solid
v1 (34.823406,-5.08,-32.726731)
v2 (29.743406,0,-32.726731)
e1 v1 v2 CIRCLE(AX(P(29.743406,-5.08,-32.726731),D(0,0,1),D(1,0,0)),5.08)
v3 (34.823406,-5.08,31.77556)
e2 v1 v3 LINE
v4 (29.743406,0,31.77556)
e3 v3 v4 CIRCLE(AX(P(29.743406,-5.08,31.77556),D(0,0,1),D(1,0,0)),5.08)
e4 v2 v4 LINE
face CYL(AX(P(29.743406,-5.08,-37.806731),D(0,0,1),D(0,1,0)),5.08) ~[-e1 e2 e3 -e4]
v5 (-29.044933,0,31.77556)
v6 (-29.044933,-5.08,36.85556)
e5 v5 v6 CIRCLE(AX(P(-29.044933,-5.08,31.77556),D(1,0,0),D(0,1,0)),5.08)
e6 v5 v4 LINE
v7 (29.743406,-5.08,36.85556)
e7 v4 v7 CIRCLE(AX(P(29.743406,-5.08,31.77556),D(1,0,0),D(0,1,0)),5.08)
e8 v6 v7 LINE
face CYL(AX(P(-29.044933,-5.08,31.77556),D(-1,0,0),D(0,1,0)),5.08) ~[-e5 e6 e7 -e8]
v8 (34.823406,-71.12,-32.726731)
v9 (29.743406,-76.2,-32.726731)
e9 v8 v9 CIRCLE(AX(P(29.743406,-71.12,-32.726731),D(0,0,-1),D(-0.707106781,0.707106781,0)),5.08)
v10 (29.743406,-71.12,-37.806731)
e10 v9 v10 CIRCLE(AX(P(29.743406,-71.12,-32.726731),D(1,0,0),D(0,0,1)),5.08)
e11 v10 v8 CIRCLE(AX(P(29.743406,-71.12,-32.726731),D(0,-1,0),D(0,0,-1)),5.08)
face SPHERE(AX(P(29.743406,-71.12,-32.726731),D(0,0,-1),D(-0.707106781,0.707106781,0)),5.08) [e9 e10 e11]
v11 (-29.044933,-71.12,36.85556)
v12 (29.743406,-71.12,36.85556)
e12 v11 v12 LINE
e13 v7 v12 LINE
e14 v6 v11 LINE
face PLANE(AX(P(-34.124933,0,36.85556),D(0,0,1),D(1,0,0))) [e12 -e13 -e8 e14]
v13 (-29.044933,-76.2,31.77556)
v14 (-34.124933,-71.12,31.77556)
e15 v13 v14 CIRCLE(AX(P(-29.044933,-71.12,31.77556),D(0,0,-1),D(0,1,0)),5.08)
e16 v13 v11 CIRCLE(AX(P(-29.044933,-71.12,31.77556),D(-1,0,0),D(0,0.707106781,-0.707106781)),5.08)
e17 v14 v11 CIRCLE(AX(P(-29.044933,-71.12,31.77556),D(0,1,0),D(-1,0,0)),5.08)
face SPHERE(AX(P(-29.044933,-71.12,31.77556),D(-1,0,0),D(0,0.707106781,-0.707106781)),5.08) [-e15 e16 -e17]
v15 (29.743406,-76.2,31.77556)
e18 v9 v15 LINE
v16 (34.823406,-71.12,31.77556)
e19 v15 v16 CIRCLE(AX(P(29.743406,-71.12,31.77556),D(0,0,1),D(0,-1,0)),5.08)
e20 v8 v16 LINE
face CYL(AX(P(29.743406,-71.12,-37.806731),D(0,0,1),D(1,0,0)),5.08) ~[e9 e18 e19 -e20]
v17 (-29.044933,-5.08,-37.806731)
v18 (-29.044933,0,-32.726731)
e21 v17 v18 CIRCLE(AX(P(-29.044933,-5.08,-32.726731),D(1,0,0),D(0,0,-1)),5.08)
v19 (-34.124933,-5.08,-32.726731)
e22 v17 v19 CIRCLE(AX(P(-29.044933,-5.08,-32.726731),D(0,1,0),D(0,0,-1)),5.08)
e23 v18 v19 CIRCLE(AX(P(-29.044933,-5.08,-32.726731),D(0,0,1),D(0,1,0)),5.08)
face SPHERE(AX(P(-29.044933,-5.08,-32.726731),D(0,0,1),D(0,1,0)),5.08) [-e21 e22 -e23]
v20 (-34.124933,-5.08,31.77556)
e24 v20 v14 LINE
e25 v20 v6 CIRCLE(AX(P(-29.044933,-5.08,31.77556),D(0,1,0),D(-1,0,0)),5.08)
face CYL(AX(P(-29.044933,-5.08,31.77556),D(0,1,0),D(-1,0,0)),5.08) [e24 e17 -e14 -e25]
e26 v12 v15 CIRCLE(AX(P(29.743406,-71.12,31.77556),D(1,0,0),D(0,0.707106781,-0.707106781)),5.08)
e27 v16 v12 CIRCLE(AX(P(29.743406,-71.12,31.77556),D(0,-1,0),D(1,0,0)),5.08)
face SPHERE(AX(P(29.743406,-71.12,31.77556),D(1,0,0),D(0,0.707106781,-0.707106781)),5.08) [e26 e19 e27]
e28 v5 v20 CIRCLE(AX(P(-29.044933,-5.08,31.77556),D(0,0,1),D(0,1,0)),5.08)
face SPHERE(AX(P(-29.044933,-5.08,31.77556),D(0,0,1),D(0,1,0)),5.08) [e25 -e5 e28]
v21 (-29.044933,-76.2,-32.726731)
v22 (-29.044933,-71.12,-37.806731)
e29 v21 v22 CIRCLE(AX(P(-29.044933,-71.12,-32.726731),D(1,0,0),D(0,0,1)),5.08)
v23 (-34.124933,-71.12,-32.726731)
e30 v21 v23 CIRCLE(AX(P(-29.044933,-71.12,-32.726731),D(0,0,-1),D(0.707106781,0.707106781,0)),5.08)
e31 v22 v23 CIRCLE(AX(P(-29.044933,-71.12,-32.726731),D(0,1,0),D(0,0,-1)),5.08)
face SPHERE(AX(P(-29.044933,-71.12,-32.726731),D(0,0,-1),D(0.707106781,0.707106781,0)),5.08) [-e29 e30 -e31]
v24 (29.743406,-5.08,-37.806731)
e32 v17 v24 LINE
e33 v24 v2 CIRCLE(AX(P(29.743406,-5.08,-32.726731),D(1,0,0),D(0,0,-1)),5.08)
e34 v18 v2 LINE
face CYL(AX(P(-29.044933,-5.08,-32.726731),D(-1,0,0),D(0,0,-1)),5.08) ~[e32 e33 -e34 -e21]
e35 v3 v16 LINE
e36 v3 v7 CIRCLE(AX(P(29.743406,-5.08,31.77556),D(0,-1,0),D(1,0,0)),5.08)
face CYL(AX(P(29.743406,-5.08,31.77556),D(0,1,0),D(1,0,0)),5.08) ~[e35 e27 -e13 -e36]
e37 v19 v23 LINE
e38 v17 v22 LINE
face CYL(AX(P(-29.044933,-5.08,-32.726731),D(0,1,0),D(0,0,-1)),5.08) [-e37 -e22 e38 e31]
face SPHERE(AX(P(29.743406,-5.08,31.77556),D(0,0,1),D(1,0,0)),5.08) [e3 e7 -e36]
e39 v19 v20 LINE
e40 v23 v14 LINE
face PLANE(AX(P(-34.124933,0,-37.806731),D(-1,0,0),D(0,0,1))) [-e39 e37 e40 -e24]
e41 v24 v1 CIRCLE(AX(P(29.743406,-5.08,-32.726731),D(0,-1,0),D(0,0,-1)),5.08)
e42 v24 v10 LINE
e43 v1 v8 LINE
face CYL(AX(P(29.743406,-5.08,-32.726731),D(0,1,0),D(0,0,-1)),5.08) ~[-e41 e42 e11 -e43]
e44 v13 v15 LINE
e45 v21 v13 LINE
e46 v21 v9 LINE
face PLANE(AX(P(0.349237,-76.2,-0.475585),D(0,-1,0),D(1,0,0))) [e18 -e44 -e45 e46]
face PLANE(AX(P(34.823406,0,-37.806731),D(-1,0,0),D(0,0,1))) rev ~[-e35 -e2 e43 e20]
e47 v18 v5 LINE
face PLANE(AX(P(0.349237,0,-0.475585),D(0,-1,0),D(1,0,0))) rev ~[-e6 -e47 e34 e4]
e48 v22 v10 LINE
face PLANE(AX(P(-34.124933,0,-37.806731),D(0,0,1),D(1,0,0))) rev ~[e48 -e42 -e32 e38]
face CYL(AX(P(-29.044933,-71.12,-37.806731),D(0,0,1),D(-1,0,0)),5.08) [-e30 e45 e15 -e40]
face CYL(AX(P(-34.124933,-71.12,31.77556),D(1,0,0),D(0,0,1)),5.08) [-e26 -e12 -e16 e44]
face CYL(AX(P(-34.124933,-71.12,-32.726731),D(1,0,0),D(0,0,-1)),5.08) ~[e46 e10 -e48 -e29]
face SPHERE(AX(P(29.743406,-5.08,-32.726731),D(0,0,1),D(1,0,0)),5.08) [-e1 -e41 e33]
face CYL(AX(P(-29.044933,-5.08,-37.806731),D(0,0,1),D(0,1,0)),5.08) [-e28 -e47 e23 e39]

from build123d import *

# Parameters (mm, degrees)
F0_W         = 68.9483396709
F0_H         = 74.6622905135
F1_DEPTH     = 76.2
F2_R         = 5.08
F3_R         = 5.08
F4_R         = 5.08
F5_T1_DEPTH  = 66.04
F5_T3_DEPTH  = 58.7883396709
F5_S7_W      = 5.08
F5_S7_H      = 5.08
F5_T8_DEPTH  = 5.08
F5_S13_W     = 5.08
F5_S13_H     = 5.08
F5_T14_DEPTH = 5.08
F5_T18_ANGLE = 90
F5_T20_ANGLE = 90
F6_T1_DEPTH  = 58.7883396709
F6_T3_DEPTH  = 66.04
F6_S7_W      = 5.08
F6_S7_H      = 5.08
F6_T8_DEPTH  = 5.08
F6_S13_W     = 5.08
F6_S13_H     = 5.08
F6_T14_DEPTH = 5.08
F6_T18_ANGLE = 90
F6_T20_ANGLE = 90


# Not quite as in the source:
# - a fillet or chamfer that OpenCascade refuses, or shapes differently, is made with other operations: its cross-section is extruded or revolved along the edge and cut away or added


with BuildPart() as f1:
    # F0 (on Front) → F1 (new body)
    with BuildSketch(Plane.XZ):
        with Locations((0.3492366523, -0.4755854607)):
            Rectangle(F0_W, F0_H)
    extrude(amount=F1_DEPTH)

    # F2
    f2_edges = [f1.edges().sort_by_distance(p)[0] for p in [
        (34.823406, -76.2, -0.475585),
        (0.349237, -76.2, 36.85556),
        (-34.124933, -76.2, -0.475585),
        (0.349237, -76.2, -37.806731),
    ]]
    fillet(f2_edges, radius=F2_R)

    # F3
    f3_edges = [f1.edges().sort_by_distance(p)[0] for p in [
        (34.823406, 0, -0.475585),
    ]]
    fillet(f3_edges, radius=F3_R)

    # F4
    f4_edges = [f1.edges().sort_by_distance(p)[0] for p in [
        (-34.124933, 0, -0.475585),
    ]]
    fillet(f4_edges, radius=F4_R)

    # F5: fillet of radius 5.08 on 1 edges, made by hand

    # F5_s2 → F5_t1 (cut)
    with BuildSketch(Plane.XZ.offset(5.08)):
        with BuildLine():
            ThreePointArc((34.8234064877, 31.7755597961), (33.3355089361, 35.3676622445), (29.7434064877, 36.8555597961))
            Line((29.7434064877, 36.8555597961), (34.8234064877, 36.8555597961))
            Line((34.8234064877, 36.8555597961), (34.8234064877, 31.7755597961))
        make_face()
        with BuildLine():
            ThreePointArc((-34.1249331832, 31.7755597961), (-32.6370356316, 35.3676622445), (-29.0449331832, 36.8555597961))
            Line((-29.0449331832, 36.8555597961), (-34.1249331832, 36.8555597961))
            Line((-34.1249331832, 36.8555597961), (-34.1249331832, 31.7755597961))
        make_face()
    extrude(amount=F5_T1_DEPTH, mode=Mode.SUBTRACT)

    # F5_s4 → F5_t3 (cut)
    with BuildSketch(Plane.YZ.offset(-29.0449331832)):
        with BuildLine():
            ThreePointArc((0, 31.7755597961), (-1.4878975516, 35.3676622445), (-5.08, 36.8555597961))
            Line((-5.08, 36.8555597961), (0, 36.8555597961))
            Line((0, 36.8555597961), (0, 31.7755597961))
        make_face()
    extrude(amount=F5_T3_DEPTH, mode=Mode.SUBTRACT)


with BuildPart() as f5_tool6:
    # F5_s7 → F5_t8 (new body)
    with BuildSketch(Plane.YZ.offset(29.7434064877)):
        with Locations((-73.66, 34.3155597961)):
            Rectangle(F5_S7_W, F5_S7_H)
    extrude(amount=F5_T8_DEPTH)

    # F5_s9 → F5_t10 (revolve, cut)
    with BuildSketch(Plane(origin=(29.7434064877, -71.12, 31.7755597961), x_dir=(0, 0.7071067812, -0.7071067812), z_dir=(0, -0.7071067812, -0.7071067812))):
        with BuildLine():
            ThreePointArc((0, -5.08), (5.08, 0), (0, 5.08))
            Line((0, 5.08), (0, -5.08))
        make_face()
    revolve(axis=Axis((29.7434064877, -71.12, 31.7755597961), (1, 0, 0)), mode=Mode.SUBTRACT)


with BuildPart() as f1_1:
    add(f1.part)

    # F5_t5: cut F5_tool6
    add(f5_tool6.part, mode=Mode.SUBTRACT)


with BuildPart() as f5_tool12:
    # F5_s13 → F5_t14 (new body)
    with BuildSketch(Plane.YZ.offset(-29.0449331832)):
        with Locations((-73.66, 34.3155597961)):
            Rectangle(F5_S13_W, F5_S13_H)
    extrude(amount=-F5_T14_DEPTH)

    # F5_s15 → F5_t16 (revolve, cut)
    with BuildSketch(Plane(origin=(-29.0449331832, -71.12, 31.7755597961), x_dir=(0, 0.7071067812, -0.7071067812), z_dir=(0, 0.7071067812, 0.7071067812))):
        with BuildLine():
            ThreePointArc((0, -5.08), (5.08, 0), (0, 5.08))
            Line((0, 5.08), (0, -5.08))
        make_face()
    revolve(axis=Axis((-29.0449331832, -71.12, 31.7755597961), (-1, 0, 0)), mode=Mode.SUBTRACT)


with BuildPart() as f1_2:
    add(f1_1.part)

    # F5_t11: cut F5_tool12
    add(f5_tool12.part, mode=Mode.SUBTRACT)

    # F5_s17 → F5_t18 (revolve, cut)
    with BuildSketch(Plane.XZ.offset(5.08)):
        with BuildLine():
            ThreePointArc((34.8234064877, 31.7755597961), (33.3355089361, 35.3676622445), (29.7434064877, 36.8555597961))
            Line((29.7434064877, 36.8555597961), (34.8234064877, 36.8555597961))
            Line((34.8234064877, 36.8555597961), (34.8234064877, 31.7755597961))
        make_face()
    revolve(axis=Axis((29.7434064877, -5.08, 36.8555597961), (0, 0, 1)), revolution_arc=F5_T18_ANGLE, mode=Mode.SUBTRACT)

    # F5_s19 → F5_t20 (revolve, cut)
    with BuildSketch(Plane.YZ.offset(-29.0449331832)):
        with BuildLine():
            ThreePointArc((0, 31.7755597961), (-1.4878975516, 35.3676622445), (-5.08, 36.8555597961))
            Line((-5.08, 36.8555597961), (0, 36.8555597961))
            Line((0, 36.8555597961), (0, 31.7755597961))
        make_face()
    revolve(axis=Axis((-29.0449331832, -5.08, 36.8555597961), (0, 0, 1)), revolution_arc=F5_T20_ANGLE, mode=Mode.SUBTRACT)

    # F6: fillet of radius 5.08 on 1 edges, made by hand

    # F6_s2 → F6_t1 (cut)
    with BuildSketch(Plane.YZ.offset(-29.0449331832)):
        with BuildLine():
            ThreePointArc((-5.08, -37.8067307174), (-1.4878975516, -36.3188331658), (0, -32.7267307174))
            Line((0, -32.7267307174), (0, -37.8067307174))
            Line((0, -37.8067307174), (-5.08, -37.8067307174))
        make_face()
    extrude(amount=F6_T1_DEPTH, mode=Mode.SUBTRACT)

    # F6_s4 → F6_t3 (cut)
    with BuildSketch(Plane.XZ.offset(5.08)):
        with BuildLine():
            ThreePointArc((29.7434064877, -37.8067307174), (33.3355089361, -36.3188331658), (34.8234064877, -32.7267307174))
            Line((34.8234064877, -32.7267307174), (34.8234064877, -37.8067307174))
            Line((34.8234064877, -37.8067307174), (29.7434064877, -37.8067307174))
        make_face()
        with BuildLine():
            ThreePointArc((-29.0449331832, -37.8067307174), (-32.6370356316, -36.3188331658), (-34.1249331832, -32.7267307174))
            Line((-34.1249331832, -32.7267307174), (-34.1249331832, -37.8067307174))
            Line((-34.1249331832, -37.8067307174), (-29.0449331832, -37.8067307174))
        make_face()
    extrude(amount=F6_T3_DEPTH, mode=Mode.SUBTRACT)


with BuildPart() as f6_tool6:
    # F6_s7 → F6_t8 (new body)
    with BuildSketch(Plane.XY.offset(-32.7267307174)):
        with Locations((32.2834064877, -73.66)):
            Rectangle(F6_S7_W, F6_S7_H)
    extrude(amount=-F6_T8_DEPTH)

    # F6_s9 → F6_t10 (revolve, cut)
    with BuildSketch(Plane(origin=(29.7434064877, -71.12, -32.7267307174), x_dir=(-0.7071067812, 0.7071067812, 0), z_dir=(-0.7071067812, -0.7071067812, 0))):
        with BuildLine():
            ThreePointArc((0, -5.08), (5.08, 0), (0, 5.08))
            Line((0, 5.08), (0, -5.08))
        make_face()
    revolve(axis=Axis((29.7434064877, -71.12, -32.7267307174), (0, 0, -1)), mode=Mode.SUBTRACT)


with BuildPart() as f1_3:
    add(f1_2.part)

    # F6_t5: cut F6_tool6
    add(f6_tool6.part, mode=Mode.SUBTRACT)


with BuildPart() as f6_tool12:
    # F6_s13 → F6_t14 (new body)
    with BuildSketch(Plane.XY.offset(-32.7267307174)):
        with Locations((-31.5849331832, -73.66)):
            Rectangle(F6_S13_W, F6_S13_H)
    extrude(amount=-F6_T14_DEPTH)

    # F6_s15 → F6_t16 (revolve, cut)
    with BuildSketch(Plane(origin=(-29.0449331832, -71.12, -32.7267307174), x_dir=(0.7071067812, 0.7071067812, 0), z_dir=(-0.7071067812, 0.7071067812, 0))):
        with BuildLine():
            ThreePointArc((0, -5.08), (5.08, 0), (0, 5.08))
            Line((0, 5.08), (0, -5.08))
        make_face()
    revolve(axis=Axis((-29.0449331832, -71.12, -32.7267307174), (0, 0, -1)), mode=Mode.SUBTRACT)


with BuildPart() as f1_4:
    add(f1_3.part)

    # F6_t11: cut F6_tool12
    add(f6_tool12.part, mode=Mode.SUBTRACT)

    # F6_s17 → F6_t18 (revolve, cut)
    with BuildSketch(Plane.YZ.offset(-29.0449331832)):
        with BuildLine():
            ThreePointArc((-5.08, -37.8067307174), (-1.4878975516, -36.3188331658), (0, -32.7267307174))
            Line((0, -32.7267307174), (0, -37.8067307174))
            Line((0, -37.8067307174), (-5.08, -37.8067307174))
        make_face()
    revolve(axis=Axis((-29.0449331832, -5.08, -37.8067307174), (0, 0, 1)), revolution_arc=F6_T18_ANGLE, mode=Mode.SUBTRACT)

    # F6_s19 → F6_t20 (revolve, cut)
    with BuildSketch(Plane.XZ.offset(5.08)):
        with BuildLine():
            ThreePointArc((29.7434064877, -37.8067307174), (33.3355089361, -36.3188331658), (34.8234064877, -32.7267307174))
            Line((34.8234064877, -32.7267307174), (34.8234064877, -37.8067307174))
            Line((34.8234064877, -37.8067307174), (29.7434064877, -37.8067307174))
        make_face()
    revolve(axis=Axis((29.7434064877, -5.08, -37.8067307174), (0, 0, 1)), revolution_arc=F6_T20_ANGLE, mode=Mode.SUBTRACT)


solid = f1_4.part
